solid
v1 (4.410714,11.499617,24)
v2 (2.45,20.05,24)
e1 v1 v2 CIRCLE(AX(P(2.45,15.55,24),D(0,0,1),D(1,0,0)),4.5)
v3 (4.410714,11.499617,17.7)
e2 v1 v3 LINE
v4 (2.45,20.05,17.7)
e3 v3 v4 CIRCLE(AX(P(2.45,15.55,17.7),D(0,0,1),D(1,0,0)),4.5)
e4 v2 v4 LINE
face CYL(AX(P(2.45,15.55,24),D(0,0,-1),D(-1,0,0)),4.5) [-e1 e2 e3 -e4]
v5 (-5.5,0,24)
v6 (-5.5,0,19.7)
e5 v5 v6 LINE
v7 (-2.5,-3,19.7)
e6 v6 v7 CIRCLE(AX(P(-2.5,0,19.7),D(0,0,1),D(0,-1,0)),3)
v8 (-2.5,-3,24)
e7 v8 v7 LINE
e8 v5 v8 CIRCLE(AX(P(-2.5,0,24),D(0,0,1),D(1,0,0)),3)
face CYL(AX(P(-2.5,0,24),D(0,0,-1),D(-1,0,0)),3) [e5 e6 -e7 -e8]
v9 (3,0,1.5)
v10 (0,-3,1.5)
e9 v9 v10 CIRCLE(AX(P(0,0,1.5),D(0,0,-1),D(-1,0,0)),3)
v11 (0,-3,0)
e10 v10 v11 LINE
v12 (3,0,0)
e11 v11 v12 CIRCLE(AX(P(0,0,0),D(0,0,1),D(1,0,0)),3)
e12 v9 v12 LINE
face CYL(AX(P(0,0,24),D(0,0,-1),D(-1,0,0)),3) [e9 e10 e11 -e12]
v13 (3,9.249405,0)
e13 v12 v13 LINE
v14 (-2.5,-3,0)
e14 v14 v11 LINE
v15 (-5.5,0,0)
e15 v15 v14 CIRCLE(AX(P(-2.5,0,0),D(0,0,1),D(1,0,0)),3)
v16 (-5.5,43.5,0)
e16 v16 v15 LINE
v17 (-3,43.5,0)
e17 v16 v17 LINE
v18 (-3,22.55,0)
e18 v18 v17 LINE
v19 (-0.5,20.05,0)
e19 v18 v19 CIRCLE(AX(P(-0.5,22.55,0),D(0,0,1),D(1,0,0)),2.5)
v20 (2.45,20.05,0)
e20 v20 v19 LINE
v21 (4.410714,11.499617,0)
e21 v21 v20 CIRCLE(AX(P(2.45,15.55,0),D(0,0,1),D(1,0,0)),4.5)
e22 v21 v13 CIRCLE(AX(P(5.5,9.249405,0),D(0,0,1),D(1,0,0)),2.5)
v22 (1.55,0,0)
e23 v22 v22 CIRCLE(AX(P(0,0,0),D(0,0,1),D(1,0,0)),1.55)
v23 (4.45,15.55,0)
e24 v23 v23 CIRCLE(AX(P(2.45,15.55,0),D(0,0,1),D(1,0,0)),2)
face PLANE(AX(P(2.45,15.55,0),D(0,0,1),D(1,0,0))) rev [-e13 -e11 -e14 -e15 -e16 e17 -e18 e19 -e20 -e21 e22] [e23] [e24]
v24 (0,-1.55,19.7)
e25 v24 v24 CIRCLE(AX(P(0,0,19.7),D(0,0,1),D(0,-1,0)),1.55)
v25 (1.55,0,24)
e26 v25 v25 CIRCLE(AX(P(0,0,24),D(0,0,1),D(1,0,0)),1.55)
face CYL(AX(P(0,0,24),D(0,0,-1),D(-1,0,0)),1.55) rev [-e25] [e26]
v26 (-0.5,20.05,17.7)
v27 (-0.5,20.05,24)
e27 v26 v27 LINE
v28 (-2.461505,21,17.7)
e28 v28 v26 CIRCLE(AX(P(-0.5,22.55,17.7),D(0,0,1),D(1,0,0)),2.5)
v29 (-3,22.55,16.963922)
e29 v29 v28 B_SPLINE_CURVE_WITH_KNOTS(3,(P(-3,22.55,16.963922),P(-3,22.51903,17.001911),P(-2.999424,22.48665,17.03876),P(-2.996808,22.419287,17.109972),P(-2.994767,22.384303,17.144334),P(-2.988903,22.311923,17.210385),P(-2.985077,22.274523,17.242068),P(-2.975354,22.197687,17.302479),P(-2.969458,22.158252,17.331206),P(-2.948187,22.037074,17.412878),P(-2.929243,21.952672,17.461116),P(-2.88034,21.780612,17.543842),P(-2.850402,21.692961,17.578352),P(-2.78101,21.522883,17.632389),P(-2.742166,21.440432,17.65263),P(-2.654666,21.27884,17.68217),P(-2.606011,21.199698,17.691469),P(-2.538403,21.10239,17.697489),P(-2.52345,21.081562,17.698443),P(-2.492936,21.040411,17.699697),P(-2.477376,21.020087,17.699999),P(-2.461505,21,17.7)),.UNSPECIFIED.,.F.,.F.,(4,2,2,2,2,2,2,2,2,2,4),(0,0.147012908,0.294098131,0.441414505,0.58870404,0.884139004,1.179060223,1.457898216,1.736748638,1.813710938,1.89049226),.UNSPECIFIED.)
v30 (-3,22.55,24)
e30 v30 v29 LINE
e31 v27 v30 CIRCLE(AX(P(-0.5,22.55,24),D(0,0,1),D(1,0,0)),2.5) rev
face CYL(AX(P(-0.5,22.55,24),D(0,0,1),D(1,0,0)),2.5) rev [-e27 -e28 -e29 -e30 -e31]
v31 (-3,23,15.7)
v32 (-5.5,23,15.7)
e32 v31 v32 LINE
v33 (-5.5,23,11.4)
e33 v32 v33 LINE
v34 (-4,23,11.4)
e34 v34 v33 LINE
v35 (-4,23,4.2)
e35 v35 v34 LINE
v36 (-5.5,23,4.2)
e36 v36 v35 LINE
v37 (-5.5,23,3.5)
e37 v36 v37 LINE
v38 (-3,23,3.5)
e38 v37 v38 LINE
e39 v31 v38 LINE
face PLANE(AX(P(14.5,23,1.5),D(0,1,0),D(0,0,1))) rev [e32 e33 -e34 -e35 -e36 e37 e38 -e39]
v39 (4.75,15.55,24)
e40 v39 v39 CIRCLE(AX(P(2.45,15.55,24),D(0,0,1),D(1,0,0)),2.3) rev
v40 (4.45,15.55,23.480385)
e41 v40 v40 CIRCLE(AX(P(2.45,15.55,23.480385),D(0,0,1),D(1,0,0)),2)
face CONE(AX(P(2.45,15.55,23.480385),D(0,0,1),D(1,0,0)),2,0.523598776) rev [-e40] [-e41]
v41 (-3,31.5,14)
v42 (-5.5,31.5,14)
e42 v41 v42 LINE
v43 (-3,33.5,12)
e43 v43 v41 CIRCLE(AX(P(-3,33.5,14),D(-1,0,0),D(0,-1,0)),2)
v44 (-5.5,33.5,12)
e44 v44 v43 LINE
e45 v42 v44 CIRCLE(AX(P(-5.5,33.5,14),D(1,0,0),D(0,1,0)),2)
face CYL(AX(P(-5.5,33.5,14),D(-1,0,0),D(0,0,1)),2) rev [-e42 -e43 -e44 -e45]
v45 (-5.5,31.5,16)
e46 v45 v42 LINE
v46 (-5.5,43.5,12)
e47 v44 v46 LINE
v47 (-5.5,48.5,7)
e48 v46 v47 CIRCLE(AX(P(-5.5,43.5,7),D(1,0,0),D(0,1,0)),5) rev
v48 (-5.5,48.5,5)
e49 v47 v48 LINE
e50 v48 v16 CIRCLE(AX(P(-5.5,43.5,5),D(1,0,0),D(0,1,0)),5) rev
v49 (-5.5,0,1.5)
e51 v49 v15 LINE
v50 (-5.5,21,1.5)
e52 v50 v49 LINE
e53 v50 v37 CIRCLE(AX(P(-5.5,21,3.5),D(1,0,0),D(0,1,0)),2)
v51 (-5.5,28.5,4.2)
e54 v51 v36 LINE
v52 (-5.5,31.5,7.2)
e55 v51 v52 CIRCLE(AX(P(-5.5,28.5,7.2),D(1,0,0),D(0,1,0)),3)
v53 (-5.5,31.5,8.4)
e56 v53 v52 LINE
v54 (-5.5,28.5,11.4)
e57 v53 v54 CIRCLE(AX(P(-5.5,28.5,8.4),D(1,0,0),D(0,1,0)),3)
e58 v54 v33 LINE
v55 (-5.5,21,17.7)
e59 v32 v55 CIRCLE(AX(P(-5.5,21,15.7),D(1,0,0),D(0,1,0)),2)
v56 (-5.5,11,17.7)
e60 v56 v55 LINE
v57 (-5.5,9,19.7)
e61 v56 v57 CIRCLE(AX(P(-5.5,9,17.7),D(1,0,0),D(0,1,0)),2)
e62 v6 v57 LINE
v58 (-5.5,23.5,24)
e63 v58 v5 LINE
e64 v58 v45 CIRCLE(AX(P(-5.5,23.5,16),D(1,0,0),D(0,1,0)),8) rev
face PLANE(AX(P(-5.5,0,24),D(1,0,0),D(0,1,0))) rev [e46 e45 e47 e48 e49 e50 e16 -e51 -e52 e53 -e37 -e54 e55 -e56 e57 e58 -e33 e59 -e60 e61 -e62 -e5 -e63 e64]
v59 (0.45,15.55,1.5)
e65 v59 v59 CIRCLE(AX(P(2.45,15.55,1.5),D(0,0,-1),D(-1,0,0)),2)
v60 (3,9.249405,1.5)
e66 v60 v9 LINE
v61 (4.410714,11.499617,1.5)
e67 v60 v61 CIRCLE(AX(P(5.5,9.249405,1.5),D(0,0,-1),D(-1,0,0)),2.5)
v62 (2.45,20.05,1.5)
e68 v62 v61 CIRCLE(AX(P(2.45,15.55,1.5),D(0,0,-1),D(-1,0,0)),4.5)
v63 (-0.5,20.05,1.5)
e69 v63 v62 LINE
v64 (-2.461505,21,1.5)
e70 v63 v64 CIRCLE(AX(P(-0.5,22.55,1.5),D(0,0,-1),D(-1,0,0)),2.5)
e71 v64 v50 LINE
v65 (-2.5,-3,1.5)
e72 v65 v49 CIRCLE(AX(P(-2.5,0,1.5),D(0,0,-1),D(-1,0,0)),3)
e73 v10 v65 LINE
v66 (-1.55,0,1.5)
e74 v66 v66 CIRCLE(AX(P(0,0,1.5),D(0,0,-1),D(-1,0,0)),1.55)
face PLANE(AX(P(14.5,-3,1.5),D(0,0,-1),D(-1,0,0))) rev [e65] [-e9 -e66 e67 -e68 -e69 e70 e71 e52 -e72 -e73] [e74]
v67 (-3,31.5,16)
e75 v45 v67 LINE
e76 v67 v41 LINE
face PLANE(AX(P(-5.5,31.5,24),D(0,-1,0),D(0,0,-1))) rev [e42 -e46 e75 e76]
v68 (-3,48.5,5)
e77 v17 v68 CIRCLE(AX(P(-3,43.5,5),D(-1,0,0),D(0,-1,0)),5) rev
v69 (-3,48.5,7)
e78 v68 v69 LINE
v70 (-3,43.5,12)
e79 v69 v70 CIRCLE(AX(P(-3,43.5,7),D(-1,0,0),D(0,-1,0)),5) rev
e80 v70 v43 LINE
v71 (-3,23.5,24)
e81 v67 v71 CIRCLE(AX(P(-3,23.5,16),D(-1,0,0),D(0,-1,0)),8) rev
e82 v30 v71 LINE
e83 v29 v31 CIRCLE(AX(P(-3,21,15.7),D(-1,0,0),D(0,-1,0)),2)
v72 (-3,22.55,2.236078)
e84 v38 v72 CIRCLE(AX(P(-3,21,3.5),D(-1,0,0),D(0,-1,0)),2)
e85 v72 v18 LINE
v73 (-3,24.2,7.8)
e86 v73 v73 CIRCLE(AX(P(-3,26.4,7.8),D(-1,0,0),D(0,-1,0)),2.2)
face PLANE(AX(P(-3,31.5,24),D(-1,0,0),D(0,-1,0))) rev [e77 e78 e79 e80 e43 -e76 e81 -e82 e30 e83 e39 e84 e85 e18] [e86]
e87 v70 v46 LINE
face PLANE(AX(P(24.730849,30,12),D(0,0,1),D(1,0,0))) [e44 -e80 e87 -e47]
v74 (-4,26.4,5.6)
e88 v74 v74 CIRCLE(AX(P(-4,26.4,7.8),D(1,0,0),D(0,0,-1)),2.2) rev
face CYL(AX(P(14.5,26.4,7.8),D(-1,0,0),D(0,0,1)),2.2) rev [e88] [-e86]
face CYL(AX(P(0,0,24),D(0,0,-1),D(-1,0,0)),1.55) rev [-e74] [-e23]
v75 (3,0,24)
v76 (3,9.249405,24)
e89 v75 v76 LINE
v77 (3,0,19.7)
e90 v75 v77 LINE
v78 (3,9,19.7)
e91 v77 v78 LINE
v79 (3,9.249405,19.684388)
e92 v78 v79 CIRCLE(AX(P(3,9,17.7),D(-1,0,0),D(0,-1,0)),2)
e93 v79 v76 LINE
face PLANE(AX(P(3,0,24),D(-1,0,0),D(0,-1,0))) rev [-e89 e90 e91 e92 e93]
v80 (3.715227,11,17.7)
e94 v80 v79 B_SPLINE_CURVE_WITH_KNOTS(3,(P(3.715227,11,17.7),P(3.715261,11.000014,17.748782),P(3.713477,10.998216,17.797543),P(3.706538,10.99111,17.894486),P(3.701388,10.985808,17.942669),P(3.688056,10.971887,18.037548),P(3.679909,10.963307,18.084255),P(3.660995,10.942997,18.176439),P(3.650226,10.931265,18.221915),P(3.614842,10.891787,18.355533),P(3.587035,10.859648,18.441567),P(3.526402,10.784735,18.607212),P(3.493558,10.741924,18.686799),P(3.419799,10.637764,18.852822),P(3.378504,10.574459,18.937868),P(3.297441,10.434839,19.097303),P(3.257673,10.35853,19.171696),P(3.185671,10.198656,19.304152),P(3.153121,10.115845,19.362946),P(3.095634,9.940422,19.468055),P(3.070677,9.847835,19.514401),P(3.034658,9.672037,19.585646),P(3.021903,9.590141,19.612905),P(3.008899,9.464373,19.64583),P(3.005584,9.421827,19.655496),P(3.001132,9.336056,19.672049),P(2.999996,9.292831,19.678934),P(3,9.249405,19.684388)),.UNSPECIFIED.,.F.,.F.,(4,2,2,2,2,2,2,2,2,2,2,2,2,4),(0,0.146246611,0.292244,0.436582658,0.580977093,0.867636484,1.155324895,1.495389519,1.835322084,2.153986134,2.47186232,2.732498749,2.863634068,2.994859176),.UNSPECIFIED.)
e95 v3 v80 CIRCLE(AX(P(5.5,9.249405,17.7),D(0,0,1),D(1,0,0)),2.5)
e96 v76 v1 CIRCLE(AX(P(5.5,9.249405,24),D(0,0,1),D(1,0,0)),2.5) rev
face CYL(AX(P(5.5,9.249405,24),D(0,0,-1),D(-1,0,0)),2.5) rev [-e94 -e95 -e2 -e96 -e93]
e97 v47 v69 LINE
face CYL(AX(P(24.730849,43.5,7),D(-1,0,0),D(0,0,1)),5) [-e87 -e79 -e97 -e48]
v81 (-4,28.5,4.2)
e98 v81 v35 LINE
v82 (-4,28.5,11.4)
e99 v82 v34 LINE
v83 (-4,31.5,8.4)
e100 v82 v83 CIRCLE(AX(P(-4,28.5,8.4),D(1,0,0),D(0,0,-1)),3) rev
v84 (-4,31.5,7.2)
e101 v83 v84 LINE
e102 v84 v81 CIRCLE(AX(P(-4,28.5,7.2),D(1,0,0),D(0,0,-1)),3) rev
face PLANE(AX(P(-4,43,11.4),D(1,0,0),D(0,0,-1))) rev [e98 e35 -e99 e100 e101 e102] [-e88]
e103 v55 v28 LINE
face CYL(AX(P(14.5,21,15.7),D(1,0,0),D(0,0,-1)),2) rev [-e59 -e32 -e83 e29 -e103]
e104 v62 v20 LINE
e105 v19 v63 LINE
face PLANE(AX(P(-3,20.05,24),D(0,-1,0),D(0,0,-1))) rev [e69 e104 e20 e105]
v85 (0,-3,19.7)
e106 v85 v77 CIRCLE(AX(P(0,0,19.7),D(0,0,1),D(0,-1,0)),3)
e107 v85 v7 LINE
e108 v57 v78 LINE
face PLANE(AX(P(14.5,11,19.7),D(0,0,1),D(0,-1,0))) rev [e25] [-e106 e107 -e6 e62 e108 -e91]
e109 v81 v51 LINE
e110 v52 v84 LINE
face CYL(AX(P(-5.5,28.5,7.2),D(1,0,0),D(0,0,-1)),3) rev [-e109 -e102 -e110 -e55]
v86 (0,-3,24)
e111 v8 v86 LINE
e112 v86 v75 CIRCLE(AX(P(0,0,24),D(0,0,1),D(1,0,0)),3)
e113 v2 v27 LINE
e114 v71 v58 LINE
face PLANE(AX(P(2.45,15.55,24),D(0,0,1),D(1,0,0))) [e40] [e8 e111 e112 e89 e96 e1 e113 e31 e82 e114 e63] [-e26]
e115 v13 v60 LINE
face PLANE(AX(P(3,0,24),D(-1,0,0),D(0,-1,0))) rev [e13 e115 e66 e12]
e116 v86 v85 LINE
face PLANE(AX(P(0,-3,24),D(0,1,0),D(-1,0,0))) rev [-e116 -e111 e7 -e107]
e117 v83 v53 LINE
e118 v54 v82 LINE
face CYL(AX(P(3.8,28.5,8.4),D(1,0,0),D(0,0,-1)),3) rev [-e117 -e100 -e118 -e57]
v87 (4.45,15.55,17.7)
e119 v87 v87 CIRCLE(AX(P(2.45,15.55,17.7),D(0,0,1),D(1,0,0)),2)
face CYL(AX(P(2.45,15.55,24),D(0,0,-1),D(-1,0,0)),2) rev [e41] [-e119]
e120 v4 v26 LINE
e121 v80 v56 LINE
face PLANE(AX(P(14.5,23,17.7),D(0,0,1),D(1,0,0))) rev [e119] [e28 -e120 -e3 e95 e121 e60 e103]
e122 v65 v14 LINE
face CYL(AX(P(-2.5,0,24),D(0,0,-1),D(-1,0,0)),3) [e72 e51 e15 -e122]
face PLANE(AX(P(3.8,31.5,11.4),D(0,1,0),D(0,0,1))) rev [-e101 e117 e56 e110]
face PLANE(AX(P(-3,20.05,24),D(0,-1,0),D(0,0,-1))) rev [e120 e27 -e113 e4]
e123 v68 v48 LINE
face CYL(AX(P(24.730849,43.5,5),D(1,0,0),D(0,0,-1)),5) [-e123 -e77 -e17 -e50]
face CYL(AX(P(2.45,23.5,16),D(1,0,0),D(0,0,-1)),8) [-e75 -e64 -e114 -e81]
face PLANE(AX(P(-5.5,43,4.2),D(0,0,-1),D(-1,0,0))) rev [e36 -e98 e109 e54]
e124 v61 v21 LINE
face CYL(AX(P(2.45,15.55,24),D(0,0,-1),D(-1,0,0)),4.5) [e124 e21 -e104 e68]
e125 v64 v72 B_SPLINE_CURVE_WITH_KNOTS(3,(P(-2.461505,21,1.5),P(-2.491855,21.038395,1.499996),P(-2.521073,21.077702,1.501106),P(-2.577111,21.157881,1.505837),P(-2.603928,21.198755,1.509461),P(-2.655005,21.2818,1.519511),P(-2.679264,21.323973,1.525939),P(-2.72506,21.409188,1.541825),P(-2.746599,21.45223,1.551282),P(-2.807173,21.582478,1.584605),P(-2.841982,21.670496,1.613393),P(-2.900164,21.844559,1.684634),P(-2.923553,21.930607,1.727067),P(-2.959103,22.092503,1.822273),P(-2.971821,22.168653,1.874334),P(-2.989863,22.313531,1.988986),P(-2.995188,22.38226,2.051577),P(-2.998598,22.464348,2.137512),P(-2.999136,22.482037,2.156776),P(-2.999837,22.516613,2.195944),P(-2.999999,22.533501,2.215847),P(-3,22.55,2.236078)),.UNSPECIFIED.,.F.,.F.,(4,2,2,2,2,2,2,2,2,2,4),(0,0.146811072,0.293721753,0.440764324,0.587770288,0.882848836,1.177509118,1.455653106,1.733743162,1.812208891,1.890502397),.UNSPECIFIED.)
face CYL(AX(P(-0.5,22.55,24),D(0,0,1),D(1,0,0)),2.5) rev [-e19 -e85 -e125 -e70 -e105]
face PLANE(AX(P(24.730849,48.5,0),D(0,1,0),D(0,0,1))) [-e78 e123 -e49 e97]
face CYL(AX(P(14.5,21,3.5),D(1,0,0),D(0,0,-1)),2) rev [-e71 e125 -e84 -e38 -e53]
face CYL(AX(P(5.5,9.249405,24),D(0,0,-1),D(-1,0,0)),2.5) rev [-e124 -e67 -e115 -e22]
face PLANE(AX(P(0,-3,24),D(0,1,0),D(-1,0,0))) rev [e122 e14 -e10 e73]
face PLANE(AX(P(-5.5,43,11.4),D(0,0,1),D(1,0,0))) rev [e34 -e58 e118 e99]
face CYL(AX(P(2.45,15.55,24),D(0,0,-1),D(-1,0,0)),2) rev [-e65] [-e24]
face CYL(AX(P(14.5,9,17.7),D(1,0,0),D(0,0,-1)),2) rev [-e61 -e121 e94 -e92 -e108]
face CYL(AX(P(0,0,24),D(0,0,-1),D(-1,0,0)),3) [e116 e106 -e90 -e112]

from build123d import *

# Parameters (mm, degrees)
CROQUIS1_R              = 2
CROQUIS1_R_2            = 1.55
SALIENTE_EXTRUIR1_DEPTH = 24
CORTAR_EXTRUIR1_DEPTH   = 20
REDONDEO1_R             = 8
REDONDEO2_R             = 2
REDONDEO5_R             = 2.5
CROQUIS3_R              = 2.2
CORTAR_EXTRUIR2_DEPTH   = 20
CROQUIS4_W              = 1.5
CROQUIS4_H              = 7.2
CORTAR_EXTRUIR3_DEPTH   = 20
SALIENTE_EXTRUIR2_REACH = 43.512
REDONDEO7_R             = 2
CROQUIS6_W              = 7.2
CROQUIS6_H              = 3
CORTAR_EXTRUIR4_DEPTH   = 1.5
REDONDEO8_R             = 3
REDONDEO9_R             = 5
CHAFL_N1_SIZE           = 0.3
CHAFL_N1_SIZE2          = 0.519615242


with BuildPart() as part:
    # Croquis1 → Saliente-Extruir1 (new body)
    with BuildSketch(Plane.XY):
        with BuildLine():
            Line((-5.5, 0), (-5.5, 31.5))
            Line((-5.5, 31.5), (-3, 31.5))
            Line((-3, 31.5), (-3, 20.05))
            Line((-3, 20.05), (2.45, 20.05))
            ThreePointArc((2.45, 20.05), (6.941557686, 15.825516889), (3, 11.08373758))
            Line((3, 11.08373758), (3, 0))
            ThreePointArc((3, 0), (2.121320344, -2.121320344), (0, -3))
            Line((0, -3), (-2.5, -3))
            ThreePointArc((-2.5, -3), (-4.621320344, -2.121320344), (-5.5, 0))
        make_face()
        with Locations((2.45, 15.55)):
            Circle(CROQUIS1_R, mode=Mode.SUBTRACT)
        Circle(CROQUIS1_R_2, mode=Mode.SUBTRACT)
    extrude(amount=SALIENTE_EXTRUIR1_DEPTH)

    # Croquis2 → Cortar-Extruir1 (cut)
    with BuildSketch(Plane.ZY.offset(5.5)):
        Polygon((1.5, -3), (19.7, -3), (19.7, 11), (17.7, 11), (17.7, 23), (1.5, 23), align=None)
    extrude(amount=-CORTAR_EXTRUIR1_DEPTH, mode=Mode.SUBTRACT)

    # Redondeo1
    redondeo1_edges = [part.edges().sort_by_distance(p)[0] for p in [
        (-4.25, 31.5, 0),
        (-4.25, 31.5, 24),
    ]]
    fillet(redondeo1_edges, radius=REDONDEO1_R)

    # Redondeo2
    redondeo2_edges = [part.edges().sort_by_distance(p)[0] for p in [
        (-1.25, 11, 19.7),
        (-4.25, 23, 17.7),
        (-4.25, 23, 1.5),
    ]]
    fillet(redondeo2_edges, radius=REDONDEO2_R - 0.0001)  # a hair under: the kernel refuses the full size

    # Redondeo5
    redondeo5_edges = [part.edges().sort_by_distance(p)[0] for p in [
        (3, 11.08373758, 0.75),
        (-3, 20.05, 20.85),
        (3, 11.08373758, 20.85),
        (-3, 20.05, 0.75),
    ]]
    fillet(redondeo5_edges, radius=REDONDEO5_R)

    # Croquis3 → Cortar-Extruir2 (cut)
    with BuildSketch(Plane.ZY.offset(5.5)):
        with Locations((7.8, 26.4)):
            Circle(CROQUIS3_R)
    extrude(amount=-CORTAR_EXTRUIR2_DEPTH, mode=Mode.SUBTRACT)

    # Croquis4 → Cortar-Extruir3 (cut)
    with BuildSketch(Plane.XZ.offset(-23)):
        with Locations((-4.75, 7.8)):
            Rectangle(CROQUIS4_W, CROQUIS4_H)
    extrude(amount=-CORTAR_EXTRUIR3_DEPTH, mode=Mode.SUBTRACT)

    # Saliente-Extruir2: up to this face of the body (flat: up to its plane)
    saliente_extruir2_end = Plane(part.part.faces().sort_by_distance((-3, 26.79790631, 12.475730365))[0])
    # Croquis5 → Saliente-Extruir2 (add, up to the picked face)
    with BuildSketch(Plane.ZY.offset(5.5), mode=Mode.PRIVATE) as saliente_extruir2_sk1:
        Polygon((0, 23.5), (0, 48.5), (12, 48.5), (12, 30), (4.2, 30), align=None)
    saliente_extruir2_tool1 = split(extrude(saliente_extruir2_sk1.sketch, amount=-SALIENTE_EXTRUIR2_REACH, mode=Mode.PRIVATE), bisect_by=saliente_extruir2_end, keep=Keep.BOTH, mode=Mode.PRIVATE)
    add(saliente_extruir2_tool1.solids().sort_by(Axis((-5.5, 38.588691, 5.733546), (1, 0, 0)))[0])

    # Redondeo7
    redondeo7_edges = [part.edges().sort_by_distance(p)[0] for p in [
        (-4.25, 31.5, 12),
    ]]
    fillet(redondeo7_edges, radius=REDONDEO7_R)

    # Croquis6 → Cortar-Extruir4 (cut)
    with BuildSketch(Plane.ZY.offset(5.5)):
        with Locations((7.8, 30)):
            Rectangle(CROQUIS6_W, CROQUIS6_H)
    extrude(amount=-CORTAR_EXTRUIR4_DEPTH, mode=Mode.SUBTRACT)

    # Redondeo8
    redondeo8_edges = [part.edges().sort_by_distance(p)[0] for p in [
        (-4.75, 31.5, 4.2),
        (-4.75, 31.5, 11.4),
    ]]
    fillet(redondeo8_edges, radius=REDONDEO8_R)

    # Redondeo9
    redondeo9_edges = [part.edges().sort_by_distance(p)[0] for p in [
        (-4.25, 48.5, 12),
        (-4.25, 48.5, 0),
    ]]
    fillet(redondeo9_edges, radius=REDONDEO9_R)

    # Chaflán1
    chafl_n1_edges = [part.edges().sort_by_distance(p)[0] for p in [
        (0.45, 15.55, 24),
    ]]
    chafl_n1_side = [part.faces().sort_by_distance(p)[0] for p in [
        (-0.877926413, 10.141568141, 24),
    ]]
    chamfer(chafl_n1_edges, length=CHAFL_N1_SIZE, length2=CHAFL_N1_SIZE2, reference=chafl_n1_side[0])


solid = part.part
